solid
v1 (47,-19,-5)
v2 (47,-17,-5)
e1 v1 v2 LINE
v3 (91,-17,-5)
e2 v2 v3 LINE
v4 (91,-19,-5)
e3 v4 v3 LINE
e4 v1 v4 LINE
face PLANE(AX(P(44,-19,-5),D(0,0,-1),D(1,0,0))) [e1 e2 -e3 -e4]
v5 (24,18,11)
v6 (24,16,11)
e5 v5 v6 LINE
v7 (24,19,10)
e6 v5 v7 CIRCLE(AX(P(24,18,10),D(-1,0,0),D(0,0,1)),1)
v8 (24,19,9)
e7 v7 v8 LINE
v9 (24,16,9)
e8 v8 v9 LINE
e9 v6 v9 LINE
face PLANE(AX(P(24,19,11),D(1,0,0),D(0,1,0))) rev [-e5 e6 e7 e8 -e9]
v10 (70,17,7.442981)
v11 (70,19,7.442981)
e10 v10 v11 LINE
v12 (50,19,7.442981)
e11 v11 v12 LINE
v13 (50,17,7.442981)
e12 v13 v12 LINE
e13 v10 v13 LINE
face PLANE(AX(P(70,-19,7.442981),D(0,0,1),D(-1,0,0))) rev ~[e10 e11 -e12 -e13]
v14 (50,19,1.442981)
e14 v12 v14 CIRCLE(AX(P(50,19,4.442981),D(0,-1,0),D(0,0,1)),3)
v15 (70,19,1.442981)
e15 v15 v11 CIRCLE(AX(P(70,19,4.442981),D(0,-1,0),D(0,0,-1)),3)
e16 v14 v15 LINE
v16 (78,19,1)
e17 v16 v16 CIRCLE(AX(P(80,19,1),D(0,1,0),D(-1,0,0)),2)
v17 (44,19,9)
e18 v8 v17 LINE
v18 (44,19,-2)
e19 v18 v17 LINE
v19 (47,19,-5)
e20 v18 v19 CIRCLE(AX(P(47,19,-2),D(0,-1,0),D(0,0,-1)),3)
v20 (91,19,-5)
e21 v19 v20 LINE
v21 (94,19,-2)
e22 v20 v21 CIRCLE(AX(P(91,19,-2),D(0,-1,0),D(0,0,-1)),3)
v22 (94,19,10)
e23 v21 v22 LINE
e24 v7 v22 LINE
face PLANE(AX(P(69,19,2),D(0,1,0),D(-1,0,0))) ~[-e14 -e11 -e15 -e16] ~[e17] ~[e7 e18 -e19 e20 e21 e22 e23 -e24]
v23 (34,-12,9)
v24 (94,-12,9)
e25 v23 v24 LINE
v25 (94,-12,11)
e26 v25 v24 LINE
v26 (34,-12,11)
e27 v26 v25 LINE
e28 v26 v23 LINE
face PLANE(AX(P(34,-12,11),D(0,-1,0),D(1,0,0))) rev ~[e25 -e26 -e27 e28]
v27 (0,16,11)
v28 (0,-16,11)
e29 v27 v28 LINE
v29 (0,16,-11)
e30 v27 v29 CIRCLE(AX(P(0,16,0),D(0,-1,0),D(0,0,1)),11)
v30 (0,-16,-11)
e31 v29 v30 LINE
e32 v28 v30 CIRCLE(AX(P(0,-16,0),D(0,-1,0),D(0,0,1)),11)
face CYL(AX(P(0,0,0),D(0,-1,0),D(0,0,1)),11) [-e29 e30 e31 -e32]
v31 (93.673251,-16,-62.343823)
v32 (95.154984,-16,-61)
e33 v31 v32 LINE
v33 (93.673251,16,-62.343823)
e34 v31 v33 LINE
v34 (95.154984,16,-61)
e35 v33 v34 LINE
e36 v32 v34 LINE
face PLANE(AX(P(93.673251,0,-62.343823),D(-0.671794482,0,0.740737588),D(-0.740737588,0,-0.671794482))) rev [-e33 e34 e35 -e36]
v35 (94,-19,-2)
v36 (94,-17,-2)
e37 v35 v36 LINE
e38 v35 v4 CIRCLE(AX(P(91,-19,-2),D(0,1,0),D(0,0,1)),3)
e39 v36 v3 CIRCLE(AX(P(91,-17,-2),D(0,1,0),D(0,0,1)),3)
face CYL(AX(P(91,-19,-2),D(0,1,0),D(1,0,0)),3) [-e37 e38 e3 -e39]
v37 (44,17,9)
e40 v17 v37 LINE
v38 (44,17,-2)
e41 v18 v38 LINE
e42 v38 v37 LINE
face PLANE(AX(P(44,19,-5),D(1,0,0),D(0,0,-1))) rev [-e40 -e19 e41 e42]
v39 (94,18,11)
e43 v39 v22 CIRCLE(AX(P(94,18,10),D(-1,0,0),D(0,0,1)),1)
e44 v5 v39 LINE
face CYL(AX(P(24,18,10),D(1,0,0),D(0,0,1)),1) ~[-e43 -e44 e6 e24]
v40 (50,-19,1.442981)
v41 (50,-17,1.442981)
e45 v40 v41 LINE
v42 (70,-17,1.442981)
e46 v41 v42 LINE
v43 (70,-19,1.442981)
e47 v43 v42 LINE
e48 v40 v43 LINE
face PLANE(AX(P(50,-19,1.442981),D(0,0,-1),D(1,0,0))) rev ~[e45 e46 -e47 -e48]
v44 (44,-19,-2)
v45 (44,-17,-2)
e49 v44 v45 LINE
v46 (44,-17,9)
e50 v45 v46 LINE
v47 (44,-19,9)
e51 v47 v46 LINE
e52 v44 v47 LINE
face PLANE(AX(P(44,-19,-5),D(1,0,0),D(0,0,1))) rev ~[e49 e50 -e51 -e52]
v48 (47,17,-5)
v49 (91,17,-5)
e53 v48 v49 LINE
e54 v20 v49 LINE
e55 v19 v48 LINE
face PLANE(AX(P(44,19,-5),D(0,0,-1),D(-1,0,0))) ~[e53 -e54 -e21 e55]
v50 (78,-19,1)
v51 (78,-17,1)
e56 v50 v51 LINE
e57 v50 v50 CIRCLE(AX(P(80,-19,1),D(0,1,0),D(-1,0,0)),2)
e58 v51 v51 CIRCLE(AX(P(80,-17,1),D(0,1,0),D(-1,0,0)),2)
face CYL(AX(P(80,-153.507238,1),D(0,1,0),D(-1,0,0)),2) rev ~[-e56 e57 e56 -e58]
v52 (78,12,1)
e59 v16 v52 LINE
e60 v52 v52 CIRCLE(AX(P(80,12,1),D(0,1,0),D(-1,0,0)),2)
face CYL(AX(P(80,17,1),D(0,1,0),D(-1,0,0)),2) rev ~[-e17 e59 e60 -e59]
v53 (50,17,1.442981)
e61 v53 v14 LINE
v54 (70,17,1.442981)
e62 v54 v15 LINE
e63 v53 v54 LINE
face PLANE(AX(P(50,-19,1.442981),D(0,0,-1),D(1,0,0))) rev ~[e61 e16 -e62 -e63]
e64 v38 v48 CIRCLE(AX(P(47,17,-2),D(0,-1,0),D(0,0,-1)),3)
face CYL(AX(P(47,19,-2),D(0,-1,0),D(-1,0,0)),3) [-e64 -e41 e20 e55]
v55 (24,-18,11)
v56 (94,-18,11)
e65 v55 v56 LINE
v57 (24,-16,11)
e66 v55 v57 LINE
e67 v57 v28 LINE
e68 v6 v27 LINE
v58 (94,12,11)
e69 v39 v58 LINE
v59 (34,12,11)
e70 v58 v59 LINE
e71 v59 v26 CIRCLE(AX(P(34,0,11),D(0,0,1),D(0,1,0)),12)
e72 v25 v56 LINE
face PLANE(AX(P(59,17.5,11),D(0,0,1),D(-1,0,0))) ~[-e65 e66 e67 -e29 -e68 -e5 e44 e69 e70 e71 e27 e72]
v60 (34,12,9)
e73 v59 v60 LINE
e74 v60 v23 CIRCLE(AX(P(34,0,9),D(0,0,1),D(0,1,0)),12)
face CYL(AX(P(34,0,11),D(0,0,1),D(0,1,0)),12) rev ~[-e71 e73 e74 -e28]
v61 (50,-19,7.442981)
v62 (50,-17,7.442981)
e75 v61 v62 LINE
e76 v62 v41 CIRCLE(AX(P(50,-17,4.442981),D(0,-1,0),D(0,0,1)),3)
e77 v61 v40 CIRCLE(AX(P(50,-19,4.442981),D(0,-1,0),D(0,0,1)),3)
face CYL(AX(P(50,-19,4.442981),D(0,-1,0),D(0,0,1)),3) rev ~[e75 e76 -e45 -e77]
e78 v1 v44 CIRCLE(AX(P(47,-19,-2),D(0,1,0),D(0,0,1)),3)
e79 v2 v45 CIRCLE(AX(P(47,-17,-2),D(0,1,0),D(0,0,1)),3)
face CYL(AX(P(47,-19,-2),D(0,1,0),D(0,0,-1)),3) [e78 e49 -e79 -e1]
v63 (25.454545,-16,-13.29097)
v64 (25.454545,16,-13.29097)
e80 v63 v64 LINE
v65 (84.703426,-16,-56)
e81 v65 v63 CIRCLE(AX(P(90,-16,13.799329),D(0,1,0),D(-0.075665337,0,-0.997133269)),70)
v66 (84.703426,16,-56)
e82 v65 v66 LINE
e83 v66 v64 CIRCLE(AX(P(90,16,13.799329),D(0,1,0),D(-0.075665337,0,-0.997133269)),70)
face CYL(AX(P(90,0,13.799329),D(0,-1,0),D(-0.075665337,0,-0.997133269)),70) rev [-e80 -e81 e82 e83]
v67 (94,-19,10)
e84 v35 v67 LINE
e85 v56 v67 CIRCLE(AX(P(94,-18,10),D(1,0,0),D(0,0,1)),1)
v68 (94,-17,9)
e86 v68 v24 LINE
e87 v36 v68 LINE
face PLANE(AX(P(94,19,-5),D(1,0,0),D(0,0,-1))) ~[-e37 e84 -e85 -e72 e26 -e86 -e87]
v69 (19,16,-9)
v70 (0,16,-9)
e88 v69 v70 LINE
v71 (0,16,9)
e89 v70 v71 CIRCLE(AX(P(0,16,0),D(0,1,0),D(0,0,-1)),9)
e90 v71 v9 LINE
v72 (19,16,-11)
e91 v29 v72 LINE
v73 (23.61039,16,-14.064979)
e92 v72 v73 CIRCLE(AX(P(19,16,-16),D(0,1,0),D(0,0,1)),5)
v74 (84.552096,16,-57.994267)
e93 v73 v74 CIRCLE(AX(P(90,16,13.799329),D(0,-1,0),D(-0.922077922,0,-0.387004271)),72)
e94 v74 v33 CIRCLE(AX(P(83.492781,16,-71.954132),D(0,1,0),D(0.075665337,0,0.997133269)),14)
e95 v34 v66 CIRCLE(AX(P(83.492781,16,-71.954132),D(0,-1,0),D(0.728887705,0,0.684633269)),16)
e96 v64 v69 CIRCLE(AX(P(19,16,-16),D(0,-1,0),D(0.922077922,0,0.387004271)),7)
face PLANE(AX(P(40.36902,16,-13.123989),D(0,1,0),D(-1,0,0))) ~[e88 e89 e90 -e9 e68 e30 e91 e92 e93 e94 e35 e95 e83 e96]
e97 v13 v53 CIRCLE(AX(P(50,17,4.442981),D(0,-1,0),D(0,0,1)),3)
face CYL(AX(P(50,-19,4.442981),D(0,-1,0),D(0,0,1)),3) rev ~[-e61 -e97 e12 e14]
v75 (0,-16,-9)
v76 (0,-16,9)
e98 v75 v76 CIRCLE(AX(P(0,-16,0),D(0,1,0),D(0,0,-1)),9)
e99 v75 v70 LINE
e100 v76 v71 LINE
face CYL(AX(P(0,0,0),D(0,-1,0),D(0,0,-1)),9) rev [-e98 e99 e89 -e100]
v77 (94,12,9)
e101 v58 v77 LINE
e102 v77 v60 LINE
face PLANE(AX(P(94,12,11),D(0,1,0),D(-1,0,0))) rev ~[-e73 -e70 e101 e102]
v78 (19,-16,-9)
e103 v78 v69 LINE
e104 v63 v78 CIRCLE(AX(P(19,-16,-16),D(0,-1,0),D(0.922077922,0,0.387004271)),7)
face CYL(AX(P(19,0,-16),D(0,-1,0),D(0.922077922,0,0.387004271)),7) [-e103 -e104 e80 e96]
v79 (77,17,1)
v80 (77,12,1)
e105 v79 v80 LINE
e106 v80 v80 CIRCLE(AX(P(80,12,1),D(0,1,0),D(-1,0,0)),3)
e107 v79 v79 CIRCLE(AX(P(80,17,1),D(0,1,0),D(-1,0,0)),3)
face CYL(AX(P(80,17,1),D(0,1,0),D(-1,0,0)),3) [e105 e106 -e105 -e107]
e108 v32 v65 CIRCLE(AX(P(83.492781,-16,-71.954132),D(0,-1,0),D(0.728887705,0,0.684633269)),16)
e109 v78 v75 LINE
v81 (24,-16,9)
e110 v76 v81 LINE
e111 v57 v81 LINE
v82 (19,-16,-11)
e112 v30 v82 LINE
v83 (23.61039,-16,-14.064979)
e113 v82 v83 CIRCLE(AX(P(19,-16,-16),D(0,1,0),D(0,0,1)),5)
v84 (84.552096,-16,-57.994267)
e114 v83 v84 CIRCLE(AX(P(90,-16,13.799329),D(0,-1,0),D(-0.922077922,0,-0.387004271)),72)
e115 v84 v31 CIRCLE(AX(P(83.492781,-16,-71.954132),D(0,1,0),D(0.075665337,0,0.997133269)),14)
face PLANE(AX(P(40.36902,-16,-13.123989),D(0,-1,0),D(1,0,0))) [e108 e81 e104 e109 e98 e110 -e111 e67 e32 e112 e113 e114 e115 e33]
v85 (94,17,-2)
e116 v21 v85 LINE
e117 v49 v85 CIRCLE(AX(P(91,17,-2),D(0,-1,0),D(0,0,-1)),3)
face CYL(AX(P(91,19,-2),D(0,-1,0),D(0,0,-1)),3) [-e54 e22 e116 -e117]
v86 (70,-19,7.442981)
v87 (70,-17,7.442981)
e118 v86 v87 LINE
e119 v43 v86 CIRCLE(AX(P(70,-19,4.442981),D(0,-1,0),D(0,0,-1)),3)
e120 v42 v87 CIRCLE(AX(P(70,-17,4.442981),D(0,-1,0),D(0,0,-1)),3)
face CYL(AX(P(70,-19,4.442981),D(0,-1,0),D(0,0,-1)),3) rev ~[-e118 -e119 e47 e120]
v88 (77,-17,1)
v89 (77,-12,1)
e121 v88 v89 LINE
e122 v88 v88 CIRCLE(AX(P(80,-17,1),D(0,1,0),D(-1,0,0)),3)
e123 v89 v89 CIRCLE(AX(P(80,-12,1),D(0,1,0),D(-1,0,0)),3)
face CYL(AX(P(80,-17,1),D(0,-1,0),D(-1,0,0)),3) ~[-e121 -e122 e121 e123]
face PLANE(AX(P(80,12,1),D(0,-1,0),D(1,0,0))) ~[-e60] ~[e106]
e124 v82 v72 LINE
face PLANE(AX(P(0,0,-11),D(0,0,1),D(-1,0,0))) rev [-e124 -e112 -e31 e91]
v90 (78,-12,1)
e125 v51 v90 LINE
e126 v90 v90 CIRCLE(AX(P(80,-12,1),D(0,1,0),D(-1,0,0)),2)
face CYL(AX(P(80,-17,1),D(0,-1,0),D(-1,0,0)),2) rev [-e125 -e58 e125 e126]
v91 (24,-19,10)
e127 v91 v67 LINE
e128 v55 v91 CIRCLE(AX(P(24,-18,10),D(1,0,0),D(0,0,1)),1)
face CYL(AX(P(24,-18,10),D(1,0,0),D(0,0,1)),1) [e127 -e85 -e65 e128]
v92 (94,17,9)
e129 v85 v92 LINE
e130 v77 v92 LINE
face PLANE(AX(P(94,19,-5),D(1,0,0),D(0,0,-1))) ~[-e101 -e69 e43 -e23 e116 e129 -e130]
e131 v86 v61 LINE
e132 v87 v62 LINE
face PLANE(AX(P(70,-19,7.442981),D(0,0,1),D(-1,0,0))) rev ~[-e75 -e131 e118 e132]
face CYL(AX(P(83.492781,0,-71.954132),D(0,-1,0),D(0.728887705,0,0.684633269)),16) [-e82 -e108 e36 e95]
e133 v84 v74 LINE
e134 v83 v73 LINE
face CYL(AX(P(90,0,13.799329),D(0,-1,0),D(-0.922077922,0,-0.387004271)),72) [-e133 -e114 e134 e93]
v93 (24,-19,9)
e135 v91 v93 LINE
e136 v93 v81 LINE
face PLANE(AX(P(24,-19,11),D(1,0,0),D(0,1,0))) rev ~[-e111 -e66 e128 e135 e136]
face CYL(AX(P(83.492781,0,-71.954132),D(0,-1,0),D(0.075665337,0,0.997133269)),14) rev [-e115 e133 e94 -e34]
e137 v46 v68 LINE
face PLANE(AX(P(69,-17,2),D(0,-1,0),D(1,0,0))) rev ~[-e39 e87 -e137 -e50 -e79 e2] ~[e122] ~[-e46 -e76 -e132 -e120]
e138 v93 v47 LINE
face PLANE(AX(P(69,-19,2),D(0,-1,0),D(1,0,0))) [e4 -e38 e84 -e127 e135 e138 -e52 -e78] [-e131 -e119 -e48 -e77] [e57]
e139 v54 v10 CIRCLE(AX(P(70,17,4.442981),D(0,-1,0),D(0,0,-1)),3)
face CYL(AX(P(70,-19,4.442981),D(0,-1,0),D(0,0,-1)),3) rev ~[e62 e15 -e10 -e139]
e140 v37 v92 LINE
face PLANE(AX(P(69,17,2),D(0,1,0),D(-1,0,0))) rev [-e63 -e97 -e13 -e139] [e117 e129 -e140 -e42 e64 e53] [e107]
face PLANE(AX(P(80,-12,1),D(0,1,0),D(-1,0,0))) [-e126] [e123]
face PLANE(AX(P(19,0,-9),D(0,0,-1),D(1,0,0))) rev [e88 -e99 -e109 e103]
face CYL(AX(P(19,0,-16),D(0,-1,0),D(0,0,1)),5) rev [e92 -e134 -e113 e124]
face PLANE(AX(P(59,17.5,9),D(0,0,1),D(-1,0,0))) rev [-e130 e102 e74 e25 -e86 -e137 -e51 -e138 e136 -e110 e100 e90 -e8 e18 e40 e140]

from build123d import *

# Parameters (mm, degrees)
F1_DEPTH  = 16
F2_W      = 70
F2_H      = 3
F3_DEPTH  = 2
F4_W      = 50
F4_H      = 14
F5_DEPTH  = 2
F6_R      = 1
F9_DEPTH  = 2
F11_DEPTH = 38.001
F13_D     = 4
F14_R     = 3
F14_R_2   = 2
F15_DEPTH = 5
F16_R     = 3


# Not quite as in the source:
# - a pattern or mirror of a feature is missing from the dataset's text; its kind, count and spacing are read off the source's solid


with BuildPart() as f1:
    # F0 (on Front) → F1 (new body)
    with BuildSketch(Plane.XZ):
        with BuildLine():
            Line((94, 11), (0, 11))
            ThreePointArc((0, 11), (-11, 0), (0, -11))
            Line((0, -11), (19, -11))
            ThreePointArc((19, -11), (21.7681124643, -11.8361612201), (23.6103896104, -14.064978646))
            ThreePointArc((23.6103896104, -14.064978646), (47.8977113224, -44.6078392712), (84.5520957277, -57.9942665386))
            ThreePointArc((84.5520957277, -57.9942665386), (89.5187953856, -59.3173941728), (93.6732506492, -62.3438233708))
            Line((93.6732506492, -62.3438233708), (95.1549842887, -61))
            ThreePointArc((95.1549842887, -61), (90.3976747979, -57.5207528796), (84.7034264019, -56))
            ThreePointArc((84.7034264019, -56), (49.0672193413, -42.9854179344), (25.4545454545, -13.2909701044))
            ThreePointArc((25.4545454545, -13.2909701044), (22.87535745, -10.1706257081), (19, -9))
            Line((19, -9), (0, -9))
            ThreePointArc((0, -9), (-9, 0), (0, 9))
            Line((0, 9), (94, 9))
            Line((94, 9), (94, 11))
        make_face()
    extrude(amount=F1_DEPTH)

    # F2 (on face) → F3 (join)
    with BuildSketch(Plane.XY.offset(11)):
        with Locations((59, -17.5)):
            Rectangle(F2_W, F2_H)
    extrude(amount=-F3_DEPTH)

    # F4 (on face) → F5 (join)
    with BuildSketch(Plane.XZ.offset(19)):
        with Locations((69, 2)):
            Rectangle(F4_W, F4_H)
    extrude(amount=-F5_DEPTH)

    # F6
    f6_edges = [f1.edges().sort_by_distance(p)[0] for p in [
        (59, -19, 11),
    ]]
    fillet(f6_edges, radius=F6_R)

    # F7: F1 across plane


with BuildPart() as f1_1:
    add(f1.part)
    add(f1.part.mirror(Plane.XZ))

    # F8 (on face) → F9 (cut)
    with BuildSketch(Plane.XY.offset(11)):
        with BuildLine():
            Line((94, 12), (34, 12))
            ThreePointArc((34, 12), (22, 0), (34, -12))
            Line((34, -12), (94, -12))
            Line((94, -12), (94, 12))
        make_face()
    extrude(amount=-F9_DEPTH, mode=Mode.SUBTRACT)

    # F10 (on face) → F11 (cut, through all)
    with BuildSketch(Plane.XZ.offset(19)):
        with BuildLine():
            ThreePointArc((50, 7.4429814443), (47, 4.4429814443), (50, 1.4429814443))
            Line((50, 1.4429814443), (70, 1.4429814443))
            ThreePointArc((70, 1.4429814443), (73, 4.4429814443), (70, 7.4429814443))
            Line((70, 7.4429814443), (50, 7.4429814443))
        make_face()
    extrude(amount=-F11_DEPTH, mode=Mode.SUBTRACT)

    # F13 (through all)
    with Locations(Plane.XZ.offset(19)):
        with Locations((80, 1)):
            Hole(F13_D / 2)

    # F14 (on face) → F15 (join)
    with BuildSketch(Plane(origin=(0, -17, 0), x_dir=(-1, 0, 0), z_dir=(0, 1, 0))):
        with Locations((-80, 1)):
            Circle(F14_R)
        with Locations((-80, 1)):
            Circle(F14_R_2, mode=Mode.SUBTRACT)
    f15 = extrude(amount=F15_DEPTH)

    # F15_copies: F15 across plane
    add(f15.mirror(Plane.ZX))

    # F16
    f16_edges = [f1_1.edges().sort_by_distance(p)[0] for p in [
        (94, 18, -5),
        (44, 18, -5),
        (94, -18, -5),
        (44, -18, -5),
    ]]
    fillet(f16_edges, radius=F16_R)


solid = f1_1.part
